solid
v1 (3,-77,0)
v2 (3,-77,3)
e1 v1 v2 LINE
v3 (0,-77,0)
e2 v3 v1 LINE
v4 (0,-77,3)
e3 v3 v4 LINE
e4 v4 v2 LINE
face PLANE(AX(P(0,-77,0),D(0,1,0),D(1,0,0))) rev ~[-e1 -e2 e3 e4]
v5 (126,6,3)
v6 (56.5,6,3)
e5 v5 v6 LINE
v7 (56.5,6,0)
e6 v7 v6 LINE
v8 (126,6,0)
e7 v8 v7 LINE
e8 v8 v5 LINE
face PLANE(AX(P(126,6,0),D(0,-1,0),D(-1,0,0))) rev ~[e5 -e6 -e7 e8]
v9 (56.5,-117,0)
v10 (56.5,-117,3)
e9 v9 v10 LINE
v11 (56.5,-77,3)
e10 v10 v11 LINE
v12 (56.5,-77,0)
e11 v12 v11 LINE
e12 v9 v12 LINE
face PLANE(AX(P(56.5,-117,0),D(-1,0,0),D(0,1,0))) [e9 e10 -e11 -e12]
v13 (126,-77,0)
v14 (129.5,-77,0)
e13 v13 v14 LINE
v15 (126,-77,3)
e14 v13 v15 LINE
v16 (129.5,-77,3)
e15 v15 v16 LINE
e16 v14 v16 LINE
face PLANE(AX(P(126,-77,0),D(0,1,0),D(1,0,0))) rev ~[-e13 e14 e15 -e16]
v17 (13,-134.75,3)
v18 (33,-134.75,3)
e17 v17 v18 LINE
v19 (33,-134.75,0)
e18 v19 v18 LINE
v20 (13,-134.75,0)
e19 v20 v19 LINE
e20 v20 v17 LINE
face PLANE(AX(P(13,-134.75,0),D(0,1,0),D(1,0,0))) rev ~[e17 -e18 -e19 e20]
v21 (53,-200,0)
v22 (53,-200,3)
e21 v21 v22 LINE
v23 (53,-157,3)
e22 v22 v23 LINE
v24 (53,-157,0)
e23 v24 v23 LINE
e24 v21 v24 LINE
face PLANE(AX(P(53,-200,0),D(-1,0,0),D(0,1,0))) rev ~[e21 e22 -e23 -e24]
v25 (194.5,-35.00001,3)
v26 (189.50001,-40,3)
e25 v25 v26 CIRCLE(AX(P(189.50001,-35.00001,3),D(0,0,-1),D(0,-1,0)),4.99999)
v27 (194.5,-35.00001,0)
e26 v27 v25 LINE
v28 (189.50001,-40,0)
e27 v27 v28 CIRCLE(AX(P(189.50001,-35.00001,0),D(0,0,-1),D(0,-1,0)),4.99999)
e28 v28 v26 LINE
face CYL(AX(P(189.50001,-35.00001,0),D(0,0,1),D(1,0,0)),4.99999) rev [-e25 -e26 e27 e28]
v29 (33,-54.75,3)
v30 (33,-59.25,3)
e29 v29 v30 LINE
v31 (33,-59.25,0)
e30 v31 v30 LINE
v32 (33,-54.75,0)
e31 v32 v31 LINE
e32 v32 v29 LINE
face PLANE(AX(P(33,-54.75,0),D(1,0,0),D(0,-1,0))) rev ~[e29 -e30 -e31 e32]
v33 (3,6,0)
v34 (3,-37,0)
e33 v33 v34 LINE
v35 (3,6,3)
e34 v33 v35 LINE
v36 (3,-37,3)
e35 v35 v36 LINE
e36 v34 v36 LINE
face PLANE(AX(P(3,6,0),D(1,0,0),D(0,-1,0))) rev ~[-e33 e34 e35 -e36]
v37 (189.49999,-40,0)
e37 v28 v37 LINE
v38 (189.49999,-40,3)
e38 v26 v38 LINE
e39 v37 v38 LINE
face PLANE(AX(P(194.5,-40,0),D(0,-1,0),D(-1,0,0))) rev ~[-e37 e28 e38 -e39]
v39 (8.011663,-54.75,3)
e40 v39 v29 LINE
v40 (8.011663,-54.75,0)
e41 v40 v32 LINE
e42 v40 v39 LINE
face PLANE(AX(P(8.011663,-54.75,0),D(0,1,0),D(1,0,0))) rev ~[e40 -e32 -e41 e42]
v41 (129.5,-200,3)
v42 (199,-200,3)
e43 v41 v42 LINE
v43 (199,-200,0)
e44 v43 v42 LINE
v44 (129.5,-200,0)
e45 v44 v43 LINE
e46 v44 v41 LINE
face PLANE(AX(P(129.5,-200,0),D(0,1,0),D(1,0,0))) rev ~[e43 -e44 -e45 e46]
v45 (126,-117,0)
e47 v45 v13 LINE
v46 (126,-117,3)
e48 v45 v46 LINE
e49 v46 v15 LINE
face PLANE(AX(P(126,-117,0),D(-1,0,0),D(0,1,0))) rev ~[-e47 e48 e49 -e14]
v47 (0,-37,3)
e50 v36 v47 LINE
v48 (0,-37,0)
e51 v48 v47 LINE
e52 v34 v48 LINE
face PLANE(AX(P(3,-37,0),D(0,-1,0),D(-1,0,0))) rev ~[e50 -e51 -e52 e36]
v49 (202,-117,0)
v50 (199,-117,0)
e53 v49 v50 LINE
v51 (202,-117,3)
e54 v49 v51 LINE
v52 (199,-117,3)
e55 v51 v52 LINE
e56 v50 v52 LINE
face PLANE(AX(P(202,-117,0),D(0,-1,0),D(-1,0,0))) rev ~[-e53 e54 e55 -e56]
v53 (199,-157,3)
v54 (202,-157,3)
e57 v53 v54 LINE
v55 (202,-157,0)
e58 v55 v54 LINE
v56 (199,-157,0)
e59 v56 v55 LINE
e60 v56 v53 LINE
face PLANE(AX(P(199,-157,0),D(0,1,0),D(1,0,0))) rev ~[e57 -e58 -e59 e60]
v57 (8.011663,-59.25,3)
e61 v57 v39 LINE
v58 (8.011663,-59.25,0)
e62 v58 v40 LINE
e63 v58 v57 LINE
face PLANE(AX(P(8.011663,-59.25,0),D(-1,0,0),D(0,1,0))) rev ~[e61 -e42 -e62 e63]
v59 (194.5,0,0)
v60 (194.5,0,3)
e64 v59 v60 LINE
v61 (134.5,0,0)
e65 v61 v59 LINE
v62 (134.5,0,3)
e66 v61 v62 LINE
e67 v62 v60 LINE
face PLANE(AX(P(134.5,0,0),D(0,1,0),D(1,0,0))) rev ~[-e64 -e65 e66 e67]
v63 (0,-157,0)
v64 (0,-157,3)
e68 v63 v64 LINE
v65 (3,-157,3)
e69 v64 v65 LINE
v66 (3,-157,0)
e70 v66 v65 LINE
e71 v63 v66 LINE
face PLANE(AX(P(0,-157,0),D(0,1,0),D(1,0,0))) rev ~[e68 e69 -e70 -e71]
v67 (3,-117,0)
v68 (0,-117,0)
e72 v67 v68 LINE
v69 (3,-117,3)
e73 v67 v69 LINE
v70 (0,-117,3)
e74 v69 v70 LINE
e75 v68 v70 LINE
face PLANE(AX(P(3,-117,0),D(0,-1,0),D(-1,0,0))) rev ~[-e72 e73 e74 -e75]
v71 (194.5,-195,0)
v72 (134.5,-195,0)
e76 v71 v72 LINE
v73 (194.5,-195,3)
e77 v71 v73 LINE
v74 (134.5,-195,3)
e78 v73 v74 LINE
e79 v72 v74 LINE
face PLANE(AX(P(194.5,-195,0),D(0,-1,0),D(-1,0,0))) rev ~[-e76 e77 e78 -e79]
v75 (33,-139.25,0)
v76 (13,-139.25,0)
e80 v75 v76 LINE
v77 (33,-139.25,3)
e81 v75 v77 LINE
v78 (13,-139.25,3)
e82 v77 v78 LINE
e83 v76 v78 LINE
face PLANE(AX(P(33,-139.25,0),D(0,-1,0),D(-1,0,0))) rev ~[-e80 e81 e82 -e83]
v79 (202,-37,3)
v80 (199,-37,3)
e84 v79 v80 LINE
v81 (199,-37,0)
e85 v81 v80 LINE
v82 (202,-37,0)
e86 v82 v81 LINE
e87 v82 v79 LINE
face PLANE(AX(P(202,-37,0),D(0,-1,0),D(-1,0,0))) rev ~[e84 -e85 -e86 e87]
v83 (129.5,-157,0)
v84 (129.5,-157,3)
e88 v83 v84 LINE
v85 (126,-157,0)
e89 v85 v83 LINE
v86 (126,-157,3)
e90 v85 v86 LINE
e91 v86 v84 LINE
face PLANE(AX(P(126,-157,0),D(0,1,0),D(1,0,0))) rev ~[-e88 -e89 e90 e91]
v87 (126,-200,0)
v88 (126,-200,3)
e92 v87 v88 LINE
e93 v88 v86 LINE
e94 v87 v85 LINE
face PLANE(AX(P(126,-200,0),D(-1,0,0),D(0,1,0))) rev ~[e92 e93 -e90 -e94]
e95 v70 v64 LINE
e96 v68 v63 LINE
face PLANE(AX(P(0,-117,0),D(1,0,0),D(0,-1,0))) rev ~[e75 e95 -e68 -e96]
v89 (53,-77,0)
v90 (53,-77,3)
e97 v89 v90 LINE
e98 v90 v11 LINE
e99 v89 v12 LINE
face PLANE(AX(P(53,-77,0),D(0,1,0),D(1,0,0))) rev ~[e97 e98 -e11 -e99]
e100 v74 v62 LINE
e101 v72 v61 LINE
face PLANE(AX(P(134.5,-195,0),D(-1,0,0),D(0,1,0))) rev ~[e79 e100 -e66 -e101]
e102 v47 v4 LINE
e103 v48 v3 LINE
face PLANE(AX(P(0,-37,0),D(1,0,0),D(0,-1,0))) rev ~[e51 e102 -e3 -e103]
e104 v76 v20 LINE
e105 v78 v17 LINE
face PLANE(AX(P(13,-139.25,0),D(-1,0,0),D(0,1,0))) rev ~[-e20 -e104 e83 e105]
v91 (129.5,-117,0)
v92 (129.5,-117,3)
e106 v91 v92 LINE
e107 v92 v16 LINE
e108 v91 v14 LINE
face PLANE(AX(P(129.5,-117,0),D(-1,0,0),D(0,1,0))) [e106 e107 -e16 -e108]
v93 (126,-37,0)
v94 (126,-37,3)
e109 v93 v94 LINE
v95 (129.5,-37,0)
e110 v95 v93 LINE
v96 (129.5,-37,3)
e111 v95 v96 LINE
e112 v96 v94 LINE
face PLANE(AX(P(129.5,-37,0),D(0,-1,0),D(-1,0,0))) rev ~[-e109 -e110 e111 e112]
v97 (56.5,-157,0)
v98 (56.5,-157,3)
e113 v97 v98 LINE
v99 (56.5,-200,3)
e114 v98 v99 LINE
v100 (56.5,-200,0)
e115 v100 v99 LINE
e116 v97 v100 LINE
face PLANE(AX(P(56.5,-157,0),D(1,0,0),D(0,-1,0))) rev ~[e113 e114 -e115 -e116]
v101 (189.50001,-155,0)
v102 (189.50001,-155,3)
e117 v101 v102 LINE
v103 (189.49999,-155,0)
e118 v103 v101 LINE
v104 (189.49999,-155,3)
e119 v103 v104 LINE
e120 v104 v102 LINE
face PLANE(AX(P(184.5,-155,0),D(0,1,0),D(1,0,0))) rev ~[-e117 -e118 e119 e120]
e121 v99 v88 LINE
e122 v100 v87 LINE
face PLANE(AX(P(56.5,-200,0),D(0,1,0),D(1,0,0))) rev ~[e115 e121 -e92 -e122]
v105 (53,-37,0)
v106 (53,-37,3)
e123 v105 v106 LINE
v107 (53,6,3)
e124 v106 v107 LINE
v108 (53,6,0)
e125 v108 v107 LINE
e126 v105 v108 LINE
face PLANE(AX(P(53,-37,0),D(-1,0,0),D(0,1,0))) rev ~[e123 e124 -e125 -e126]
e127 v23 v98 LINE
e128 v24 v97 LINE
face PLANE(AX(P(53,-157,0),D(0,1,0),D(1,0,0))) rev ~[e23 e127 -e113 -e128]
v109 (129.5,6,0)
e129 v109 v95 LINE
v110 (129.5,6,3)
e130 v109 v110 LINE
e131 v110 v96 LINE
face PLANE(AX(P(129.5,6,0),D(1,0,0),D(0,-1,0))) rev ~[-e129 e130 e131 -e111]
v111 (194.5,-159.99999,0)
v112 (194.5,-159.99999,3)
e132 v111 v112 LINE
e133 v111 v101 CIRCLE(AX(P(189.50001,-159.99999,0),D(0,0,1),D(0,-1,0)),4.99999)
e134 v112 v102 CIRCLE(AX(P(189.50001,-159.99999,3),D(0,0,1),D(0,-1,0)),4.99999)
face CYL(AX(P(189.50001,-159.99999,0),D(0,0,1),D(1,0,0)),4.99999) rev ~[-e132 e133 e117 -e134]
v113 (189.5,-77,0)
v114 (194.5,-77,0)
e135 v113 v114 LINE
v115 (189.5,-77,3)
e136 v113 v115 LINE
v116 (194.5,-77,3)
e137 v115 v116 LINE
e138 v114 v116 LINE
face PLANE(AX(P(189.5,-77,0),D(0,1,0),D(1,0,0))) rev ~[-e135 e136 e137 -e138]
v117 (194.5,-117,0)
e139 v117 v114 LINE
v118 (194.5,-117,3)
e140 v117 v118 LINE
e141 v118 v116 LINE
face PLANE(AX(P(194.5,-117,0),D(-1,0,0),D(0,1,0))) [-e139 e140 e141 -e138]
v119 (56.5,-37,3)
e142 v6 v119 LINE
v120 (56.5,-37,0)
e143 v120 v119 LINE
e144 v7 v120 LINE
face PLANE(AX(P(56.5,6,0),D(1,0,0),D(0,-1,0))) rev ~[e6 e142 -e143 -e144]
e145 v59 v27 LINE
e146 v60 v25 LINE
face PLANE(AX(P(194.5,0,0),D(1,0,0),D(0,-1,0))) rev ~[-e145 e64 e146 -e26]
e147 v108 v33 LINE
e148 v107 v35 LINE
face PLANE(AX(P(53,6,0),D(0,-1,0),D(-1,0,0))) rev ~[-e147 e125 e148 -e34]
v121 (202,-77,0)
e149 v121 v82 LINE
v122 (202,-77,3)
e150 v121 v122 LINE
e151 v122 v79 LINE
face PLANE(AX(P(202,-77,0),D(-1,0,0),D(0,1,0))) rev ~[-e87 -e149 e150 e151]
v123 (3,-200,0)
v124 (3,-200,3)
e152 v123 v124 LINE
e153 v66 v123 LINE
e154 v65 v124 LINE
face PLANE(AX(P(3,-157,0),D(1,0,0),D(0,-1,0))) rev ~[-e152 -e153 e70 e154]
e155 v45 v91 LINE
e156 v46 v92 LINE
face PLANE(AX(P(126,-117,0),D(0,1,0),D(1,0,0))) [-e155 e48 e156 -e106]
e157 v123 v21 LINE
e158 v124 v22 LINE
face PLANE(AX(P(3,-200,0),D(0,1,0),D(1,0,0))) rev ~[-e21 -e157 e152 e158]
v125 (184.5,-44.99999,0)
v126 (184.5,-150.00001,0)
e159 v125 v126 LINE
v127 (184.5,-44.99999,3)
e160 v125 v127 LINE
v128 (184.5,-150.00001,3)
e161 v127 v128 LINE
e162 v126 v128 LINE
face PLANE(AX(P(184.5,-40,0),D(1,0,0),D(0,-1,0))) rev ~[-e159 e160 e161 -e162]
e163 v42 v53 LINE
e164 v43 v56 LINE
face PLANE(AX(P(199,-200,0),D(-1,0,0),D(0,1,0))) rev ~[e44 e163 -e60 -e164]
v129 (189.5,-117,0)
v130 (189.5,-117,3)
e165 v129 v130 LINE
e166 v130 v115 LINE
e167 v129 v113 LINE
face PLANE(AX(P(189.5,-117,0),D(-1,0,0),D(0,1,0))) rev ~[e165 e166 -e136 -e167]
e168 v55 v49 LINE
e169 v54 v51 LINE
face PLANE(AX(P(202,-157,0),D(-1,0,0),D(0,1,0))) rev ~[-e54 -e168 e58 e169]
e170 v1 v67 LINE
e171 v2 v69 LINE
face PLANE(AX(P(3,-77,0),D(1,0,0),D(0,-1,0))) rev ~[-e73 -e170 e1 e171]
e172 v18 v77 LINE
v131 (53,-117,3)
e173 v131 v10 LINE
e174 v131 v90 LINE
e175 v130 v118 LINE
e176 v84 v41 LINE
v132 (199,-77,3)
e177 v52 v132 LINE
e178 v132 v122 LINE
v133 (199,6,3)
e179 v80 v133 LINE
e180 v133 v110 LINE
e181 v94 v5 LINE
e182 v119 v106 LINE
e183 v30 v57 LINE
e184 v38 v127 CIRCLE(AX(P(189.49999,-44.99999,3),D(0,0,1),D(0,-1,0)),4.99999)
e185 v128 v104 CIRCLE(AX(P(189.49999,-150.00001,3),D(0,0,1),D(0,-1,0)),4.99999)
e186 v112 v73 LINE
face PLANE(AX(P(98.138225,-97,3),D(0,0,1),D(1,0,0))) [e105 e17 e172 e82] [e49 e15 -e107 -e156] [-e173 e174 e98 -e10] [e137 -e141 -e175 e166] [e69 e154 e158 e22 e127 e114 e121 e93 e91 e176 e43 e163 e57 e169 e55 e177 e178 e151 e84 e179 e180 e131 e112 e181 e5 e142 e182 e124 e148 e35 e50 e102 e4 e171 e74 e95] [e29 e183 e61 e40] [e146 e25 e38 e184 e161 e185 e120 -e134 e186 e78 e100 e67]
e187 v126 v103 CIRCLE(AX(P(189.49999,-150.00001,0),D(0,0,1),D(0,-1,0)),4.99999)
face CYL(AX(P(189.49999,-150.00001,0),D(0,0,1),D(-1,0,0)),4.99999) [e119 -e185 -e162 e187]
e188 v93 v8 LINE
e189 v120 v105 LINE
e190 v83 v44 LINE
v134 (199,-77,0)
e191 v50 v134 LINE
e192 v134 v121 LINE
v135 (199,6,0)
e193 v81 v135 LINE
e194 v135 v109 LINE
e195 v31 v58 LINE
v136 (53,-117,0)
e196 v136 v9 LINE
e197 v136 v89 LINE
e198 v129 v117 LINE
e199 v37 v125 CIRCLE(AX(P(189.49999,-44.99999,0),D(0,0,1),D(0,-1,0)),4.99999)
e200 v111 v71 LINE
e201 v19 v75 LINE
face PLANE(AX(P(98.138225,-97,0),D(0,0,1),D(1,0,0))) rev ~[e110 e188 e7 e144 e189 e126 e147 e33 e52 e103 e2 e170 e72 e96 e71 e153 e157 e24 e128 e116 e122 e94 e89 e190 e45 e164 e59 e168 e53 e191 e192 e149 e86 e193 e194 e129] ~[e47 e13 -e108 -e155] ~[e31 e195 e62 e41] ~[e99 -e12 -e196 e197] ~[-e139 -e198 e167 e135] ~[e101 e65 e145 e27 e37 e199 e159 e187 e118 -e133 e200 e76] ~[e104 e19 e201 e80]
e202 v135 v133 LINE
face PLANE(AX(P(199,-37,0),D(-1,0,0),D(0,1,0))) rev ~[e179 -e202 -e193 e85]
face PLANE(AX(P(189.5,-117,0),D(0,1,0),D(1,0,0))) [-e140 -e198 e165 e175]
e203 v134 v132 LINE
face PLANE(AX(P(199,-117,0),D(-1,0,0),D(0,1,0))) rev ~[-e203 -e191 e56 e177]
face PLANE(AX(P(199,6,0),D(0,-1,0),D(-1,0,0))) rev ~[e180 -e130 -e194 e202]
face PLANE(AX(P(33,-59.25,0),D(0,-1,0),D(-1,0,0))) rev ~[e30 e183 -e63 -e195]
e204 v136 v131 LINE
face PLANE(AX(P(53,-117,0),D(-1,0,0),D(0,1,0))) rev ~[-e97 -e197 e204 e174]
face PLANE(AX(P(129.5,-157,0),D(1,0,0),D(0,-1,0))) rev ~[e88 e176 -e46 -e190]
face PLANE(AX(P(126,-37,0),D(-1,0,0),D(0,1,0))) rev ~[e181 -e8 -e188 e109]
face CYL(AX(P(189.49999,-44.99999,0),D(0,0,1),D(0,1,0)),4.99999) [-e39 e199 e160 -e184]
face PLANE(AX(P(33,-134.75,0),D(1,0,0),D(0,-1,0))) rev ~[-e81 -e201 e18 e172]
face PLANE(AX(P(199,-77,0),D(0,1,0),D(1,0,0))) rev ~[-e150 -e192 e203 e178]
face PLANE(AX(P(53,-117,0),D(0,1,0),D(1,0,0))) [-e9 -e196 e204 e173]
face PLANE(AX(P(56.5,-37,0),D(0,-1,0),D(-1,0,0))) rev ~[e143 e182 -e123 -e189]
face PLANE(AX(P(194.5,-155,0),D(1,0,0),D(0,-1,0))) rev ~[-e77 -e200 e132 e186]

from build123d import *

# Parameters (mm, degrees)
F0_W     = 3.5
F0_H     = 40
F0_W_2   = 5
F1_DEPTH = 3
F2_R     = 4.99999
F3_R     = 4.99999


# Not quite as in the source:
# - a fillet or chamfer is up to 0.001 mm smaller than in the source, because OpenCascade refuses the exact size


with BuildPart() as f1:
    # F0 (on Top) → F1 (new body)
    with BuildSketch(Plane.XY):
        Polygon((129.5, -200), (199, -200), (199, -157), (202, -157), (202, -117), (199, -117), (199, -77), (202, -77), (202, -37), (199, -37), (199, 6), (129.5, 6), (129.5, -37), (126, -37), (126, 6), (56.5, 6), (56.5, -37), (53, -37), (53, 6), (3, 6), (3, -37), (0, -37), (0, -77), (3, -77), (3, -117), (0, -117), (0, -157), (3, -157), (3, -200), (53, -200), (53, -157), (56.5, -157), (56.5, -200), (126, -200), (126, -157), (129.5, -157), align=None)
        Polygon((33, -134.75), (33, -137), (33, -139.25), (13, -139.25), (13, -134.75), align=None, mode=Mode.SUBTRACT)
        with Locations((54.75, -97)):
            Rectangle(F0_W, F0_H, mode=Mode.SUBTRACT)
        with Locations((127.75, -97)):
            Rectangle(F0_W, F0_H, mode=Mode.SUBTRACT)
        Polygon((134.5, -195), (134.5, -97), (134.5, 0), (194.5, 0), (194.5, -40), (184.5, -40), (184.5, -155), (194.5, -155), (194.5, -195), align=None, mode=Mode.SUBTRACT)
        with Locations((192, -97)):
            Rectangle(F0_W_2, F0_H, mode=Mode.SUBTRACT)
        Polygon((33, -54.75), (33, -57), (33, -59.25), (8.0116633326, -59.25), (8.0116633326, -54.75), align=None, mode=Mode.SUBTRACT)
    extrude(amount=F1_DEPTH)

    # F2 (radius 5 in the source; OpenCascade refuses exactly that, so slightly less here)
    f2_edges = [f1.edges().sort_by_distance(p)[0] for p in [
        (194.5, -40, 1.5),
        (184.5, -40, 1.5),
    ]]
    fillet(f2_edges, radius=F2_R)

    # F3 (radius 5 in the source; OpenCascade refuses exactly that, so slightly less here)
    f3_edges = [f1.edges().sort_by_distance(p)[0] for p in [
        (194.5, -155, 1.5),
        (184.5, -155, 1.5),
    ]]
    fillet(f3_edges, radius=F3_R)


solid = f1.part
